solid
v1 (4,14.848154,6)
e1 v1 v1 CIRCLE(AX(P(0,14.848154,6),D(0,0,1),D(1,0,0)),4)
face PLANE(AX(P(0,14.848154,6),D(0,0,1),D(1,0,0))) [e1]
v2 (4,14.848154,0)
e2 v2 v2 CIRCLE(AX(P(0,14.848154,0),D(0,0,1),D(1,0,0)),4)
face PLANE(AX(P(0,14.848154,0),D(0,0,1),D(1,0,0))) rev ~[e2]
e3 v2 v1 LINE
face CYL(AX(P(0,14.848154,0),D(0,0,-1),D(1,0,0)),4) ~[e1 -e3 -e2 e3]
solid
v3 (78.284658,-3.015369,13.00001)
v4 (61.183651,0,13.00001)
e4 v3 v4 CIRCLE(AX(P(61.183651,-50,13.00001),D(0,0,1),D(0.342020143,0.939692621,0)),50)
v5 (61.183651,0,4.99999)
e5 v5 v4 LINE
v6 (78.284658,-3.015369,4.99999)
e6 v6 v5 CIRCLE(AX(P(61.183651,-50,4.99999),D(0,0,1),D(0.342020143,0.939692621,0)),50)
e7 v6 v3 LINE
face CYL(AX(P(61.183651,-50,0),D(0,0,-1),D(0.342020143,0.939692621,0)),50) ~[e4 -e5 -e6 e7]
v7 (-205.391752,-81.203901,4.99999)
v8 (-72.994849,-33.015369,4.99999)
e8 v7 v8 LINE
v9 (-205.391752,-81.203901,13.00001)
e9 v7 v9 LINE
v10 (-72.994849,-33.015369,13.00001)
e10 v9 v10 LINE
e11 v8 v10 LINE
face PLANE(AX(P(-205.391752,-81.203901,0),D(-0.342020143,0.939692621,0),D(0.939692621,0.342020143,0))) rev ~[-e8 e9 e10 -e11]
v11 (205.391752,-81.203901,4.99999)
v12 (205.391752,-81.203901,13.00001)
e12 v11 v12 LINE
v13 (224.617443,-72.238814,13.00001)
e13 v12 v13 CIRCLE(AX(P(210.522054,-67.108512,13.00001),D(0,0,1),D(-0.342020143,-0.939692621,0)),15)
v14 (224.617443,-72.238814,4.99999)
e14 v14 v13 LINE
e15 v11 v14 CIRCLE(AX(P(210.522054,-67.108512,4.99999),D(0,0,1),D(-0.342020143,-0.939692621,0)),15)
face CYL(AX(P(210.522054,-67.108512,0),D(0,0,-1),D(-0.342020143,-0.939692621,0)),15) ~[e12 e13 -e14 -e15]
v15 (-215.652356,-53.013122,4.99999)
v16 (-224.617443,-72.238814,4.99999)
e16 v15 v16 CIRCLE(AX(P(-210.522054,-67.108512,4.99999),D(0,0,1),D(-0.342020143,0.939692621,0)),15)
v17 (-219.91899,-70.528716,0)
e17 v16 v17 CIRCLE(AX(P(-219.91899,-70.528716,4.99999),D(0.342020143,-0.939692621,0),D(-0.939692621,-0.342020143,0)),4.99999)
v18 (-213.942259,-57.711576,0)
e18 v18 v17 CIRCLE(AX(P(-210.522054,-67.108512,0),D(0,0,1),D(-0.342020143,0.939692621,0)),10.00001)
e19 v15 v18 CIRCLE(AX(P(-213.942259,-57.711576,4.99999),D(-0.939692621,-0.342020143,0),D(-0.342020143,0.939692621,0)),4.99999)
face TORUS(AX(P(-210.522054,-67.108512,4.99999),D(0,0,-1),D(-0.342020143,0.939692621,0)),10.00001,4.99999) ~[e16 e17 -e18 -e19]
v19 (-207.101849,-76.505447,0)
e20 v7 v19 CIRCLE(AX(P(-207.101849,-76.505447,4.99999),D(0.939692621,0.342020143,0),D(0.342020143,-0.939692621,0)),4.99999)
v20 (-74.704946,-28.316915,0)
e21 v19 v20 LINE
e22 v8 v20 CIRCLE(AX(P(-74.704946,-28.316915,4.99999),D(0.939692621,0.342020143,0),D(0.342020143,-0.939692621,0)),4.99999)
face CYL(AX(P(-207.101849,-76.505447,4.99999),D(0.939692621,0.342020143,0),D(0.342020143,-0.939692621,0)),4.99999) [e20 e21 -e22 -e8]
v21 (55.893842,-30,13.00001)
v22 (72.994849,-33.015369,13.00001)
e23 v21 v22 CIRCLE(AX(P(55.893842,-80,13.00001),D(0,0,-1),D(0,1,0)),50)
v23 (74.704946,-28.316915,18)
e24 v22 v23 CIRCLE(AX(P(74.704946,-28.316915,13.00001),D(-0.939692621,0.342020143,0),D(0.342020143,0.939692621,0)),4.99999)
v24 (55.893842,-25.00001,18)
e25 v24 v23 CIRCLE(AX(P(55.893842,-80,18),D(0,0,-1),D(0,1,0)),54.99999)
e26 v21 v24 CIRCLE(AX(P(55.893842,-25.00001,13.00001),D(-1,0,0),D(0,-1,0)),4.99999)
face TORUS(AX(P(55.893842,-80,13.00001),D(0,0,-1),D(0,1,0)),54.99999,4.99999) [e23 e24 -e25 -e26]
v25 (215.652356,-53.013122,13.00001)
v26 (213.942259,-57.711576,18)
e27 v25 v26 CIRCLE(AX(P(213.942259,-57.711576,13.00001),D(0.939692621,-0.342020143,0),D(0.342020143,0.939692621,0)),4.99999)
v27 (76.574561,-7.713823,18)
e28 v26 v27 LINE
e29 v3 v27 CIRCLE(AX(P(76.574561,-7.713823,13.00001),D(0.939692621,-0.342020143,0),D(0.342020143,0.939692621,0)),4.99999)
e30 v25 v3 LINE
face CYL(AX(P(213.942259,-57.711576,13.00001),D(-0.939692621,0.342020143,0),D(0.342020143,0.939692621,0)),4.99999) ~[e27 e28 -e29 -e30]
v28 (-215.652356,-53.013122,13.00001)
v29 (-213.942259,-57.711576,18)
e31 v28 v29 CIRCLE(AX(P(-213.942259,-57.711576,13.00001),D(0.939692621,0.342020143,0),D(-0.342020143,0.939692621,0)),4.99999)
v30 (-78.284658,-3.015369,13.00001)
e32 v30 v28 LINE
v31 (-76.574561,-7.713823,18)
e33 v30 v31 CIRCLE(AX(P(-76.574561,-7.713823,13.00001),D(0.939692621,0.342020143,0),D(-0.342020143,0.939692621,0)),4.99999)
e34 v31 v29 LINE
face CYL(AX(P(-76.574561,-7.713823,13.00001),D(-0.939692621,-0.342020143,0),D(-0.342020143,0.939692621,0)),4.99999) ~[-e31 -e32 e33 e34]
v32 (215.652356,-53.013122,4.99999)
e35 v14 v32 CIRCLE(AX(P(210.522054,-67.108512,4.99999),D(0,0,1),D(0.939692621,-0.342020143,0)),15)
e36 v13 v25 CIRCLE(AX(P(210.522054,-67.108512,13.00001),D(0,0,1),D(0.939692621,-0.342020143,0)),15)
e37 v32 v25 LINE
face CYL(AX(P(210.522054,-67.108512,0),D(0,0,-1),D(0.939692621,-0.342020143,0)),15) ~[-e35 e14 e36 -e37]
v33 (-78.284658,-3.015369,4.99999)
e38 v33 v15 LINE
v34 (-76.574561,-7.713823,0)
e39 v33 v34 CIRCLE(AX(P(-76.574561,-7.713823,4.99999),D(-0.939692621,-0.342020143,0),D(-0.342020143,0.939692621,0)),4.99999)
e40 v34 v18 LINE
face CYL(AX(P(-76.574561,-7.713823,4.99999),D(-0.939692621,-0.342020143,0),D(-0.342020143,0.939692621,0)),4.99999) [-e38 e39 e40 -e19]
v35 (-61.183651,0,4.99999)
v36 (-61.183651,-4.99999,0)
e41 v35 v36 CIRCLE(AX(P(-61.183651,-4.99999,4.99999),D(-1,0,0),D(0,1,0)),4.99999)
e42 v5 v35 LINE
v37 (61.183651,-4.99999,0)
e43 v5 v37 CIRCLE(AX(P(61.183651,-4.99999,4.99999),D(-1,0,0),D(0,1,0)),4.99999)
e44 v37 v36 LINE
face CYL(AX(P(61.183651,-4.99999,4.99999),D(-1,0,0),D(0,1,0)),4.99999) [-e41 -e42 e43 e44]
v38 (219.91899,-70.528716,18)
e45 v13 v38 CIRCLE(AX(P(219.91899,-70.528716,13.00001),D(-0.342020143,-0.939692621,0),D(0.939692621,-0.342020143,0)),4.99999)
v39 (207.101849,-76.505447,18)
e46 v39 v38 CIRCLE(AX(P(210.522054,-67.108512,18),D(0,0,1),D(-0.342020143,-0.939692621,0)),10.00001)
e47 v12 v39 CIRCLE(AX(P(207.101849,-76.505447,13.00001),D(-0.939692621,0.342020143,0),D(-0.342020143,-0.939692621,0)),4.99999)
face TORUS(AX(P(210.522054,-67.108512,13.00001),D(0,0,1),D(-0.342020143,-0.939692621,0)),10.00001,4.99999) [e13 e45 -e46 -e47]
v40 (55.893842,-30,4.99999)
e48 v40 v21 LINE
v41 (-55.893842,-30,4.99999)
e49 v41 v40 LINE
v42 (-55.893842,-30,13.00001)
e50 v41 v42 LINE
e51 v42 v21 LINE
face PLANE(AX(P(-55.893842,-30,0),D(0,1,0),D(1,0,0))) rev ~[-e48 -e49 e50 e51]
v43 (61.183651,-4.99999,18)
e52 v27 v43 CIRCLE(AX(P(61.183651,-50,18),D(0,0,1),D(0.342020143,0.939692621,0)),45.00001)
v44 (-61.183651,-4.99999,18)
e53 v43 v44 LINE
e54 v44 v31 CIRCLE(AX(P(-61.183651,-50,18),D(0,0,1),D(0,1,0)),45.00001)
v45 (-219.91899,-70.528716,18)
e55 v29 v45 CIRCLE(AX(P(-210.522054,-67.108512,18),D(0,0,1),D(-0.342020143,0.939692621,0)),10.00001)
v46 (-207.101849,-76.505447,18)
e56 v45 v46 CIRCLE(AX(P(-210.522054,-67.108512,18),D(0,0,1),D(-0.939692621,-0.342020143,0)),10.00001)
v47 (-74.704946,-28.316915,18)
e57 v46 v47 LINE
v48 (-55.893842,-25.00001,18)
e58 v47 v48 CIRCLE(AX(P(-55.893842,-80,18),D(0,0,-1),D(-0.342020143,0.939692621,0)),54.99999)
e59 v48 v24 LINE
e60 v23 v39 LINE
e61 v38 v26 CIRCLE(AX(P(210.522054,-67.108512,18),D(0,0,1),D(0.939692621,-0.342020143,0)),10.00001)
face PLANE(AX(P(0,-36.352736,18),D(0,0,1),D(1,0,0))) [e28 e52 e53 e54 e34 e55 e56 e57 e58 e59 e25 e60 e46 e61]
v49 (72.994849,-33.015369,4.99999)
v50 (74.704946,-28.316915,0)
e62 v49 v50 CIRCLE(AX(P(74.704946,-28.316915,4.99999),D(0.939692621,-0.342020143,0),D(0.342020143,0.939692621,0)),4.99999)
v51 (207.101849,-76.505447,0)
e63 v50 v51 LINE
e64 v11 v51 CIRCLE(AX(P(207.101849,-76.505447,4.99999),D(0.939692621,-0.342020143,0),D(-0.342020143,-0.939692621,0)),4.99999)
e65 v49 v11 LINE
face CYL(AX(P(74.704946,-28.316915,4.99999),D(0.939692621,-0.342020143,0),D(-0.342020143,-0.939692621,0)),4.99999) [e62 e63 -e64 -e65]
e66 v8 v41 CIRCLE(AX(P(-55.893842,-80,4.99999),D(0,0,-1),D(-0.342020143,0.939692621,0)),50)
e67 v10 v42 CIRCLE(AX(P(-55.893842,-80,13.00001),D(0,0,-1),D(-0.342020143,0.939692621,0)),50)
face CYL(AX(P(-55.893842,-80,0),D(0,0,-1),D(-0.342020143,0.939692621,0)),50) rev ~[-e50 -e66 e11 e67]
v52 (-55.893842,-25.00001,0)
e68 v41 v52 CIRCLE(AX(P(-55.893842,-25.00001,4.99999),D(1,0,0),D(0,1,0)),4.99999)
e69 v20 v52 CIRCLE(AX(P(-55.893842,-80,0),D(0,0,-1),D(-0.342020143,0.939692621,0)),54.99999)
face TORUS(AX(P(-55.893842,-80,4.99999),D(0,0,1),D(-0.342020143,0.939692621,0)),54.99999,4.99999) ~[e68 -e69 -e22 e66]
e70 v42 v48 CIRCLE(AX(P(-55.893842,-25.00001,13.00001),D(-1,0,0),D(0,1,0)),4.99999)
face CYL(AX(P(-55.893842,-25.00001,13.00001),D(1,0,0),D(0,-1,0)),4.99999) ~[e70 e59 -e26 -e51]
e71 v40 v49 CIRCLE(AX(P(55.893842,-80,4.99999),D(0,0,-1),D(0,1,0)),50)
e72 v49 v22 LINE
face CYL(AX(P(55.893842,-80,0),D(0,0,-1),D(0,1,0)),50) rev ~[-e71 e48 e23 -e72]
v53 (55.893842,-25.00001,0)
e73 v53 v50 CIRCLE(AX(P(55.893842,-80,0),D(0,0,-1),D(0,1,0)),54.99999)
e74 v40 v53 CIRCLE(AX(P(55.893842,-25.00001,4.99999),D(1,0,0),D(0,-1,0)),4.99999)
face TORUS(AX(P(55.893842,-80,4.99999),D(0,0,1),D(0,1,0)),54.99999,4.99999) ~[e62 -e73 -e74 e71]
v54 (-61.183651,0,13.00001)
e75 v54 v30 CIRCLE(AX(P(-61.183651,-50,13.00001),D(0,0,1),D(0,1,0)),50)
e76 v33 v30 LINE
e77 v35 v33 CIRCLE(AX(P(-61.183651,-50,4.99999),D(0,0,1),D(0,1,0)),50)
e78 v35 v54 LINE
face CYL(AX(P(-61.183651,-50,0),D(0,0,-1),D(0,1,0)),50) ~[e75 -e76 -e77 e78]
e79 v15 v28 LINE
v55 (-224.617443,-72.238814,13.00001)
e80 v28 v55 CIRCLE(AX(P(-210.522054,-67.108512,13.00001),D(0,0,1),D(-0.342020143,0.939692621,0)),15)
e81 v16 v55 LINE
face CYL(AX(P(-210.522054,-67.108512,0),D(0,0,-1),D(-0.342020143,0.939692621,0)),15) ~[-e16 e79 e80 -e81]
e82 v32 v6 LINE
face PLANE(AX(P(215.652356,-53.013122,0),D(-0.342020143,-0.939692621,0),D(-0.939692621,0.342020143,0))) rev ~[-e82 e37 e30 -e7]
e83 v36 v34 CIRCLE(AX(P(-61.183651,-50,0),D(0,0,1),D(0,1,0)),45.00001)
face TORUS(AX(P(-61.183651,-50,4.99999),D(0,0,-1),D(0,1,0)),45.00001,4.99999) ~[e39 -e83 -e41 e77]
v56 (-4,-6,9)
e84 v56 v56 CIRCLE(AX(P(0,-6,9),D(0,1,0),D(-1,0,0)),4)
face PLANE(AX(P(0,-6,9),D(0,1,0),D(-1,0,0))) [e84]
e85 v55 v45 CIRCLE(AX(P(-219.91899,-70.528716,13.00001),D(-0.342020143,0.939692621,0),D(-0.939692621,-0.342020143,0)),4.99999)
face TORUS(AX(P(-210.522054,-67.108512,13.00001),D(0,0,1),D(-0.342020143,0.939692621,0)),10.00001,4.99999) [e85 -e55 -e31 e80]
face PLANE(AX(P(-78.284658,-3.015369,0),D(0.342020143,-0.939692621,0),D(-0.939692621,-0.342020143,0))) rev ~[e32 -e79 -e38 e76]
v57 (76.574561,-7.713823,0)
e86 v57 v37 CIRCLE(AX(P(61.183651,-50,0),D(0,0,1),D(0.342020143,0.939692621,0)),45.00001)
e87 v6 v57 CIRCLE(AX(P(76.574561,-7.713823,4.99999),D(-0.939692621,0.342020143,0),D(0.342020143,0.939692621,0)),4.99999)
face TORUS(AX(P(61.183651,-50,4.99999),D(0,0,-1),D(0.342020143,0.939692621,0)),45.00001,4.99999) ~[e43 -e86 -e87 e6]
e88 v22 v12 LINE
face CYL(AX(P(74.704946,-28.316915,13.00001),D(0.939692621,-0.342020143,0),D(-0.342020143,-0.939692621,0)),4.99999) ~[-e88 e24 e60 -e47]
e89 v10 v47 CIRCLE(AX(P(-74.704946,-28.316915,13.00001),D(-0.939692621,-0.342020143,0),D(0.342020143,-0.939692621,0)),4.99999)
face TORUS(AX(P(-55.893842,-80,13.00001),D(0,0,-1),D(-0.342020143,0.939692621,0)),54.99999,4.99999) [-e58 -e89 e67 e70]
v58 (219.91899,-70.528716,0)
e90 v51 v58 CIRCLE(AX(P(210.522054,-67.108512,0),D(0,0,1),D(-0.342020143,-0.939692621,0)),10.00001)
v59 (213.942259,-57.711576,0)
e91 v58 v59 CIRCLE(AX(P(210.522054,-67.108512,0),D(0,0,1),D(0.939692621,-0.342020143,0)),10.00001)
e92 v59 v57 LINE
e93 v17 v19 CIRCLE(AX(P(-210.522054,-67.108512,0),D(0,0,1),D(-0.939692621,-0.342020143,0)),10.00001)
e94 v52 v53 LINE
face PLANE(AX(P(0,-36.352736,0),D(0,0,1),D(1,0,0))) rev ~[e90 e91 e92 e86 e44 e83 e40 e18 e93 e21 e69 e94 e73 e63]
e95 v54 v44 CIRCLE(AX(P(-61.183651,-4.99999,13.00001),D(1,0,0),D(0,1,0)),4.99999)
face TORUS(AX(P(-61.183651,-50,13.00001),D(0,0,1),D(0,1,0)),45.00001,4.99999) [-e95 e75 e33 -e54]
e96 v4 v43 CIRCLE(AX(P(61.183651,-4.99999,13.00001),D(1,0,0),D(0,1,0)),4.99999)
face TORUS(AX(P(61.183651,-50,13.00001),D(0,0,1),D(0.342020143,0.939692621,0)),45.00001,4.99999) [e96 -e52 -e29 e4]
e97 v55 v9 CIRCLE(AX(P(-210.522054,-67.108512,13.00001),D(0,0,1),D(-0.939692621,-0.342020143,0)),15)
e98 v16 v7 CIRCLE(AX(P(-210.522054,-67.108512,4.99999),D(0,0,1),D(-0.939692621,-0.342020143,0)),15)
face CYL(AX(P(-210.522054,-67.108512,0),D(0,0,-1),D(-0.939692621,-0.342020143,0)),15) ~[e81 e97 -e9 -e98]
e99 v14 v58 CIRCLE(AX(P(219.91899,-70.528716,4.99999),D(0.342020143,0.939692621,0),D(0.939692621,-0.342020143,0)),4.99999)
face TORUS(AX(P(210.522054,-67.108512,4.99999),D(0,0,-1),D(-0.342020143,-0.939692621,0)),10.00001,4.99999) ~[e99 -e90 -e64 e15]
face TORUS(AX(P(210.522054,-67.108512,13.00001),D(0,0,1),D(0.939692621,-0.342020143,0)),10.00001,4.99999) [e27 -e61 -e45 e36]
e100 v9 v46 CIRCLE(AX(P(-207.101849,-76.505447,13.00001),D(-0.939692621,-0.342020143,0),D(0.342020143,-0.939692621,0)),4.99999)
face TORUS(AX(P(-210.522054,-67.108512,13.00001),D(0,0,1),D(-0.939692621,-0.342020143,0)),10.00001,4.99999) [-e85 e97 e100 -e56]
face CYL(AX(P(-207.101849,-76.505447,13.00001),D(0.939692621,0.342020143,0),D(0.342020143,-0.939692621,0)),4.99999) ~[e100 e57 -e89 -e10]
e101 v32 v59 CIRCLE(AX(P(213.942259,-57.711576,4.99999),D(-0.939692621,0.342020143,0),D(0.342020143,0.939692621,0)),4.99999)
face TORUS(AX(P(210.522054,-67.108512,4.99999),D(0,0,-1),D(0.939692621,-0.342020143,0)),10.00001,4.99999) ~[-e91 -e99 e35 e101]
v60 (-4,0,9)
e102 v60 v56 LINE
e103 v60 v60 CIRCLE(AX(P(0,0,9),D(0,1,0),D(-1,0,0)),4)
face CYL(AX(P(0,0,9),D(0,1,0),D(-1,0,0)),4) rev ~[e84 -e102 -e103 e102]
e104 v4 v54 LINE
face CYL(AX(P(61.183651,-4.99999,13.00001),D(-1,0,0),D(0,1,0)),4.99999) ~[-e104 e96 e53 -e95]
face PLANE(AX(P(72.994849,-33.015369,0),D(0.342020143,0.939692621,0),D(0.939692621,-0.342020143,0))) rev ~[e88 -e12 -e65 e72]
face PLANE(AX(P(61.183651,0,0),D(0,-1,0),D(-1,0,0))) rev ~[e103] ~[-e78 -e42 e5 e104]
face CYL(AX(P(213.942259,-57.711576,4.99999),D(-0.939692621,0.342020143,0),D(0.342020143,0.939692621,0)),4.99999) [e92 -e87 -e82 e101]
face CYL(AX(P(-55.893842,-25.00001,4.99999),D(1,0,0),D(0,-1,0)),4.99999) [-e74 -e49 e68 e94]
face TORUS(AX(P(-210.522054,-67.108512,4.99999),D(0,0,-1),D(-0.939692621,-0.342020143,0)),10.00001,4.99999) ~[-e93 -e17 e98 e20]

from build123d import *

# Parameters (mm, degrees)
F1_DEPTH = 18
F2_R     = 4
F3_DEPTH = 6
F4_R     = 4
F5_DEPTH = 6
F6_R     = 4.99999


# Not quite as in the source:
# - a fillet or chamfer is up to 0.001 mm smaller than in the source, because OpenCascade refuses the exact size


with BuildPart() as f1:
    # F0 (on Top) → F1 (new body)
    with BuildSketch(Plane.XY):
        with BuildLine():
            Line((61.1836509646, 0), (0, 0))
            Line((0, 0), (-61.1836509646, 0))
            ThreePointArc((-61.1836509646, 0), (-69.8660598479, -0.7596123494), (-78.2846581309, -3.0153689607))
            Line((-78.2846581309, -3.0153689607), (-215.6523562218, -53.0131222155))
            ThreePointArc((-215.6523562218, -53.0131222155), (-224.1166708775, -60.7692376012), (-224.6174433837, -72.2388136772))
            ThreePointArc((-224.6174433837, -72.2388136772), (-216.861327998, -80.7031283328), (-205.391751922, -81.2039008391))
            Line((-205.391751922, -81.2039008391), (-72.9948487096, -33.0153689607))
            ThreePointArc((-72.9948487096, -33.0153689607), (-64.5762504267, -30.7596123494), (-55.8938415433, -30))
            Line((-55.8938415433, -30), (0, -30))
            Line((0, -30), (55.8938415433, -30))
            ThreePointArc((55.8938415433, -30), (64.5762504267, -30.7596123494), (72.9948487096, -33.0153689607))
            Line((72.9948487096, -33.0153689607), (205.391751922, -81.2039008391))
            ThreePointArc((205.391751922, -81.2039008391), (216.861327998, -80.7031283328), (224.6174433837, -72.2388136772))
            ThreePointArc((224.6174433837, -72.2388136772), (224.1166708775, -60.7692376012), (215.6523562218, -53.0131222155))
            Line((215.6523562218, -53.0131222155), (78.2846581309, -3.0153689607))
            ThreePointArc((78.2846581309, -3.0153689607), (69.8660598479, -0.7596123494), (61.1836509646, 0))
        make_face()
    extrude(amount=F1_DEPTH)

    # F2 (on face) → F3 (cut)
    with BuildSketch(Plane(origin=(0, 0, 0), x_dir=(-1, 0, 0), z_dir=(0, 1, 0))):
        with Locations((0, 9)):
            Circle(F2_R)
    extrude(amount=-F3_DEPTH, mode=Mode.SUBTRACT)

    # F6 (radius 5 in the source; OpenCascade refuses exactly that, so slightly less here)
    f6_edges = [f1.edges().sort_by_distance(p)[0] for p in [
        (0, 0, 0),
        (0, 0, 18),
    ]]
    fillet(f6_edges, radius=F6_R)


with BuildPart() as f5:
    # F4 (on Top) → F5 (new body)
    with BuildSketch(Plane.XY):
        with Locations((0, 14.8481540382)):
            Circle(F4_R)
    extrude(amount=F5_DEPTH)


solid = Compound([f1.part, f5.part])
